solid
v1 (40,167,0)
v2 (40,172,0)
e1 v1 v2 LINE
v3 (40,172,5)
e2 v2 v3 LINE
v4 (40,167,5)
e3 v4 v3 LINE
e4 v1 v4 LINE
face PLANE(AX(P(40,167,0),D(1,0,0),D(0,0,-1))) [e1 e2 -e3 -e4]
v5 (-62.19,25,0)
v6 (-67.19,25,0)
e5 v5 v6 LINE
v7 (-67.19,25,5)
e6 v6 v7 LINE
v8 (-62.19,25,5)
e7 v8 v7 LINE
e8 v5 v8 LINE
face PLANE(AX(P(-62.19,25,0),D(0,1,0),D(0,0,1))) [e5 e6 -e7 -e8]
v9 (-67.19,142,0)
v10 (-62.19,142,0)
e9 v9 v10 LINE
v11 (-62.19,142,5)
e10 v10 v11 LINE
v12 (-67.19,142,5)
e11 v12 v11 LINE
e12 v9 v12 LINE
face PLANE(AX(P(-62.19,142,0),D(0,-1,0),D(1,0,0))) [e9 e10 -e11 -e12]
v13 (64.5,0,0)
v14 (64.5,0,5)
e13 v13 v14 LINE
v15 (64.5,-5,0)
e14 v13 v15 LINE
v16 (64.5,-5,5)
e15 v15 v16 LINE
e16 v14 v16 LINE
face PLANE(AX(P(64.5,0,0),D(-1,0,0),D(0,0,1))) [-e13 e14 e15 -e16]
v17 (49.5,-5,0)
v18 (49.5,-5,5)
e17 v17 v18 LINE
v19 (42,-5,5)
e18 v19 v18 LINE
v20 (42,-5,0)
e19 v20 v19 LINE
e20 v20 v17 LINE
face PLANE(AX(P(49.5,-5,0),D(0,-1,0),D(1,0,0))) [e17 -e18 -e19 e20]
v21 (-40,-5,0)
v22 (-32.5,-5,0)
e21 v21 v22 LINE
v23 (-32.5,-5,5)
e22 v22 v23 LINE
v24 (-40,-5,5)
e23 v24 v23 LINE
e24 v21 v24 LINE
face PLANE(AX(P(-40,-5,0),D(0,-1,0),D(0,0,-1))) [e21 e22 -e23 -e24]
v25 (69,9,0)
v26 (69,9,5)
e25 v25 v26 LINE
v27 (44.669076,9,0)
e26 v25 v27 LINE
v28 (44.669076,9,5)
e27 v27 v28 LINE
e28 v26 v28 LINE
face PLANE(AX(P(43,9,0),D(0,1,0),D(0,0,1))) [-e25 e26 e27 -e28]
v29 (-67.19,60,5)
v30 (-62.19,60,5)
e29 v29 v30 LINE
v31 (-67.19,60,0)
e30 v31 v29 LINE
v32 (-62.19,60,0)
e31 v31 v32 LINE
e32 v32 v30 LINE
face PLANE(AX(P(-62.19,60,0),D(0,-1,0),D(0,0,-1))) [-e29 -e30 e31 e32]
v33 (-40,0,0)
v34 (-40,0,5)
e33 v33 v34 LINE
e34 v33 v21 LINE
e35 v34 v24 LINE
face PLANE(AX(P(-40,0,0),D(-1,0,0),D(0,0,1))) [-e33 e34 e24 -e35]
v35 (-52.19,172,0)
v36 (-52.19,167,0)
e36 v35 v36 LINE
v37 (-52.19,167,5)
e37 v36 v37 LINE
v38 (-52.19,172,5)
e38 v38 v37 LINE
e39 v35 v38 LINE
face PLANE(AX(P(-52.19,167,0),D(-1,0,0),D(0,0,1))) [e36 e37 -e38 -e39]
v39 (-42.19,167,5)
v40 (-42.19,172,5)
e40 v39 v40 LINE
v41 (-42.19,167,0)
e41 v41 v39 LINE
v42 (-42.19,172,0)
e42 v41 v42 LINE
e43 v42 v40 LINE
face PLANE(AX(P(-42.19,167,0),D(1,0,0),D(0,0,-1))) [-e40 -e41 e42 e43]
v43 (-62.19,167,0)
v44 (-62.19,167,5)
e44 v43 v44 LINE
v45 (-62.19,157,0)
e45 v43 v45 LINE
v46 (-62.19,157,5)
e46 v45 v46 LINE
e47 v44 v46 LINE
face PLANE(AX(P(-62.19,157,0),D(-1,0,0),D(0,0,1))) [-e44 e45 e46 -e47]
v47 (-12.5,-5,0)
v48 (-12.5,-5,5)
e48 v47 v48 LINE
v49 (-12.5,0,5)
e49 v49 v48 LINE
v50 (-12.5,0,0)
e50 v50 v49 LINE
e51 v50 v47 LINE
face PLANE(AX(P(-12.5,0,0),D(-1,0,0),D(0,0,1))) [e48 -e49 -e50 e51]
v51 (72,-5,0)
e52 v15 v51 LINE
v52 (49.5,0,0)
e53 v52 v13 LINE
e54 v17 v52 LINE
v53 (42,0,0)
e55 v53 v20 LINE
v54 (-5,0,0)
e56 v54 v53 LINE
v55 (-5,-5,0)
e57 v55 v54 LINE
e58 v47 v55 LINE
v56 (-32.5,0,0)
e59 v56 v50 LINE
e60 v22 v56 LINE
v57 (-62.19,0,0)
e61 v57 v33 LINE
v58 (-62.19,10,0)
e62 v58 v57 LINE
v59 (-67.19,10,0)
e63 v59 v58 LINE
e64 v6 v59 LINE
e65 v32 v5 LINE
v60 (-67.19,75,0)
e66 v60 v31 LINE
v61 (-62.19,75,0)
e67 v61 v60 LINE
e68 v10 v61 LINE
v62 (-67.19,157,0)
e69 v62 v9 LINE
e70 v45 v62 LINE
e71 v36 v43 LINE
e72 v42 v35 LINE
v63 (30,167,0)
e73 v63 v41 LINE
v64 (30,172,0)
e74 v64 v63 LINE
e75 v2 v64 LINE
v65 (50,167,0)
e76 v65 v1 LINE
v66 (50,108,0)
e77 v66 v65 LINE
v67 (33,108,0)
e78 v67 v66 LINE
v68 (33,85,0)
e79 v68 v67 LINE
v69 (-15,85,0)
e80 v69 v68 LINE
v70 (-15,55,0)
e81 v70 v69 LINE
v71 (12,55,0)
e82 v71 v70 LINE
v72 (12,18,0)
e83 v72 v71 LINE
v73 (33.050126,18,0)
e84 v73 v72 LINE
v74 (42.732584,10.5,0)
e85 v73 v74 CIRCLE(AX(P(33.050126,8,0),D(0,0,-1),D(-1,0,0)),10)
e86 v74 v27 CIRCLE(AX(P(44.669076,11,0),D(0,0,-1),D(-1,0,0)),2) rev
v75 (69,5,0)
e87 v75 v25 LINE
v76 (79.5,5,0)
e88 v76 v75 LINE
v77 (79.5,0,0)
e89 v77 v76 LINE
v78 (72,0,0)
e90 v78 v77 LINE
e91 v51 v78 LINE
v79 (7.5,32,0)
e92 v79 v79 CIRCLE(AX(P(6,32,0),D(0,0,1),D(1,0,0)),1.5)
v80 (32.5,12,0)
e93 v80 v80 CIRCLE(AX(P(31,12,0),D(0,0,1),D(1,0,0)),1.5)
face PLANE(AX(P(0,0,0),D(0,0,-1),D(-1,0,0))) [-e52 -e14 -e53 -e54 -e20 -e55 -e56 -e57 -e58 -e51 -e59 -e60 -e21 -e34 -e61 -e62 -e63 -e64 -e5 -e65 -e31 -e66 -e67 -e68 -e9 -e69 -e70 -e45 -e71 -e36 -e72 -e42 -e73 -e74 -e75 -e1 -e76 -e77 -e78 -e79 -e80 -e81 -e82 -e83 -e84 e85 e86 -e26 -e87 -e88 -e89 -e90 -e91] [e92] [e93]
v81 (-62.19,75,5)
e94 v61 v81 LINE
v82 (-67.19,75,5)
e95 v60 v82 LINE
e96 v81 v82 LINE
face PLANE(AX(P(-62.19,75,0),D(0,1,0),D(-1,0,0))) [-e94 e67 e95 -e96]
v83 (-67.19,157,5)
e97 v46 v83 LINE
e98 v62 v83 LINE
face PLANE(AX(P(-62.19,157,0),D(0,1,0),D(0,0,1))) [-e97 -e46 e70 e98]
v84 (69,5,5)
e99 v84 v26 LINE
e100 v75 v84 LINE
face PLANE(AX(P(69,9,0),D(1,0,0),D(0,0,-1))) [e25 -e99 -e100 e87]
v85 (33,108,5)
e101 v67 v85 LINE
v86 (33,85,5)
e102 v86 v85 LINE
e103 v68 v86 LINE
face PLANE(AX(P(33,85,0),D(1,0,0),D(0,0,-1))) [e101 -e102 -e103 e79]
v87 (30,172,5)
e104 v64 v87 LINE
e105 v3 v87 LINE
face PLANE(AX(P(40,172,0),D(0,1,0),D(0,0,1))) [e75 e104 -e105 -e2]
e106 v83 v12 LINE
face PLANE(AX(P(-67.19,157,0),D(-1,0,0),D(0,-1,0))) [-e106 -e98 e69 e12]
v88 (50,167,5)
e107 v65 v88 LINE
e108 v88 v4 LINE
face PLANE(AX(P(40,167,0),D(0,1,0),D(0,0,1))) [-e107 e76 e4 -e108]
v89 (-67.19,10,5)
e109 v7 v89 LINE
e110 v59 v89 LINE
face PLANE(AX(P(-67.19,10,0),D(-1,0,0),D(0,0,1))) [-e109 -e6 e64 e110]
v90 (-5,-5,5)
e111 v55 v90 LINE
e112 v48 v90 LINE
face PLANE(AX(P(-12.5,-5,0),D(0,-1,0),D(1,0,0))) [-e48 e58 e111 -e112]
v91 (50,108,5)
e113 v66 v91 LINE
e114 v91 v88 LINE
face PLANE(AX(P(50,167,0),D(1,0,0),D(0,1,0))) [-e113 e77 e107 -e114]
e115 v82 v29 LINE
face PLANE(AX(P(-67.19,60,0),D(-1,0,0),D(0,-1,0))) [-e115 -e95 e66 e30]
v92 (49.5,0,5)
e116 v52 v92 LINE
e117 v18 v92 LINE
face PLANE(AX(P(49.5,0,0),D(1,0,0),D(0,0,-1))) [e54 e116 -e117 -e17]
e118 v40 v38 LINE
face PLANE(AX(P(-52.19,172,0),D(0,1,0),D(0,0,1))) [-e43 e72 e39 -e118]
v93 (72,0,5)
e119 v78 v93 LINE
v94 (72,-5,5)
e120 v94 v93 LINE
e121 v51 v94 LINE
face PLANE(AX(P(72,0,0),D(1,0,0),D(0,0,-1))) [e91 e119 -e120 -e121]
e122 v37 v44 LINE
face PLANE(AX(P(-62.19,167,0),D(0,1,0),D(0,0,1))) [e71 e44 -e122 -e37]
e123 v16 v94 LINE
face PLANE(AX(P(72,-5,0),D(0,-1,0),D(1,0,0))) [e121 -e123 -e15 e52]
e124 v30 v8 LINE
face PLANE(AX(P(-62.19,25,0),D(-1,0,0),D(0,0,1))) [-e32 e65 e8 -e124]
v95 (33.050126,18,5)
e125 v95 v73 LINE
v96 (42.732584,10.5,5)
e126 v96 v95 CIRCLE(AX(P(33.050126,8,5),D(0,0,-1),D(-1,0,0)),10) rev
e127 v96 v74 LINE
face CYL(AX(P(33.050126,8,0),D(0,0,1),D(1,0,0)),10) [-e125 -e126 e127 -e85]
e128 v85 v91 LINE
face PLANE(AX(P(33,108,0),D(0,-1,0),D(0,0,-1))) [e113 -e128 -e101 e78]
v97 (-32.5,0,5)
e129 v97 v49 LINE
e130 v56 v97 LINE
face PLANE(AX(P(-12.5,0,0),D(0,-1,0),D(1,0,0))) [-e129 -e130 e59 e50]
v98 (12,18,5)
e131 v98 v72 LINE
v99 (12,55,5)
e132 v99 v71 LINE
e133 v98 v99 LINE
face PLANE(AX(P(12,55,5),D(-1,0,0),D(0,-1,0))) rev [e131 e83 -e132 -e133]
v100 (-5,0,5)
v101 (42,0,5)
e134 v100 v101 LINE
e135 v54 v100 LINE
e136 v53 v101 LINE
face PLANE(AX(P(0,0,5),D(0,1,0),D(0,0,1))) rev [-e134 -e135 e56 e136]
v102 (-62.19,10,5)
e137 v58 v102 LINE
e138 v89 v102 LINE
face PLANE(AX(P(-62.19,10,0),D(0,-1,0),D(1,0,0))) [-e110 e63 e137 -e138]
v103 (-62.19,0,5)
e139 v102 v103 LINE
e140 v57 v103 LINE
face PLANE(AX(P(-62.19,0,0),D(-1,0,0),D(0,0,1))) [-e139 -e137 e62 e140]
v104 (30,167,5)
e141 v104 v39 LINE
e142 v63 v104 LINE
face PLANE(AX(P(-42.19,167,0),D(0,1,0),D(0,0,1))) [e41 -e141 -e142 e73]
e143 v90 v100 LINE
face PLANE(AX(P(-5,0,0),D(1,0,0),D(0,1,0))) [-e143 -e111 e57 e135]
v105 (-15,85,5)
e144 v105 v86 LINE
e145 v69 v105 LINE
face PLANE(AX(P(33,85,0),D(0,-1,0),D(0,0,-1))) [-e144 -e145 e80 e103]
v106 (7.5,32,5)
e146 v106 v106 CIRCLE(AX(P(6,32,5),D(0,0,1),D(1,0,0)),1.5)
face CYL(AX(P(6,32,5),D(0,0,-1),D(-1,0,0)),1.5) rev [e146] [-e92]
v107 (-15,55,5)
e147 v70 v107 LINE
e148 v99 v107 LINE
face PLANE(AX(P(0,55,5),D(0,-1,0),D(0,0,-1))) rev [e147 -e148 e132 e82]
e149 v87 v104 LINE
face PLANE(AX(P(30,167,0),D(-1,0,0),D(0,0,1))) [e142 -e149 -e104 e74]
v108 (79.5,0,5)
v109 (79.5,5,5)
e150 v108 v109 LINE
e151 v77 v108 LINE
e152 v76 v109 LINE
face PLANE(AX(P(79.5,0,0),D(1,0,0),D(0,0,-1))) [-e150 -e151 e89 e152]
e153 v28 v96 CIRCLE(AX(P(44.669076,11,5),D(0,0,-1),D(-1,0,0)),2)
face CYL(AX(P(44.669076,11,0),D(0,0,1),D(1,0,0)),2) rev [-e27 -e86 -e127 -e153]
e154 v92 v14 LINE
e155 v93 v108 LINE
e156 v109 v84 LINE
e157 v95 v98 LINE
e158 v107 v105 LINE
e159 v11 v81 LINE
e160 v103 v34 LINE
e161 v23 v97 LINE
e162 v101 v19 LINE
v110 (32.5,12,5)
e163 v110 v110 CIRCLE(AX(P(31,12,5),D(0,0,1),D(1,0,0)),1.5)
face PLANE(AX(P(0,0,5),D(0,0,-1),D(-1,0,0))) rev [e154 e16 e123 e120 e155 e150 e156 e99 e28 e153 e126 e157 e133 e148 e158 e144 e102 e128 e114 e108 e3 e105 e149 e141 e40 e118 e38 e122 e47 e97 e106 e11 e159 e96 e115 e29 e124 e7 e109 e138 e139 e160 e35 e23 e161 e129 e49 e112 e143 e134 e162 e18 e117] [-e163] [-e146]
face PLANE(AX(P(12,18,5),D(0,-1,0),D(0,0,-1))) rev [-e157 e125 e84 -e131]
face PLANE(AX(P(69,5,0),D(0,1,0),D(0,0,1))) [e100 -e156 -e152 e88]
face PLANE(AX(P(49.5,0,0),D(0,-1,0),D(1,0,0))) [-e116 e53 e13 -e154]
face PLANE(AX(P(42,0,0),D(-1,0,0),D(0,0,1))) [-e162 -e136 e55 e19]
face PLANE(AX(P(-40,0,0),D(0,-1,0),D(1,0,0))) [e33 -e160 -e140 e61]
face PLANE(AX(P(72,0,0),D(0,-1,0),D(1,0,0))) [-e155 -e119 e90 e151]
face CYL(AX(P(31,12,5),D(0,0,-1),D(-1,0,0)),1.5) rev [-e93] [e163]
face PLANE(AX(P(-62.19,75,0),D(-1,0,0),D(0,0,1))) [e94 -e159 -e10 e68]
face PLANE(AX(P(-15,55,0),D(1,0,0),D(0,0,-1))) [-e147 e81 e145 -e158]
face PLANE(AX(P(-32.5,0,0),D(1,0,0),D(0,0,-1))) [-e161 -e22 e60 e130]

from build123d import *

# Parameters (mm, degrees)
ESQUISSE1_R        = 1.5
BOSS_EXTRU_1_DEPTH = 5
BOSS_EXTRU_2_DEPTH = 5
CONG_1_R           = 10
CONG_2_R           = 2


with BuildPart() as part:
    # Esquisse1 → Boss.-Extru.1 (new body)
    with BuildSketch(Plane.XY):
        Polygon((0, 0), (37, 0), (37, 18), (12, 18), (12, 55), (0, 55), align=None)
        with Locations((6, 32)):
            Circle(ESQUISSE1_R, mode=Mode.SUBTRACT)
        with Locations((31, 12)):
            Circle(ESQUISSE1_R, mode=Mode.SUBTRACT)
    extrude(amount=BOSS_EXTRU_1_DEPTH)

    # Esquisse2 → Boss.-Extru.2 (add)
    with BuildSketch(Plane.XY.offset(5)):
        Polygon((37, 0), (42, 0), (42, -5), (49.5, -5), (49.5, 0), (64.5, 0), (64.5, -5), (72, -5), (72, 0), (79.5, 0), (79.5, 5), (69, 5), (69, 9), (43, 9), (43, 18), (37, 18), align=None)
        Polygon((0, 0), (-5, 0), (-5, -5), (-12.5, -5), (-12.5, 0), (-32.5, 0), (-32.5, -5), (-40, -5), (-40, 0), (-62.19, 0), (-62.19, 10), (-67.19, 10), (-67.19, 25), (-62.19, 25), (-62.19, 60), (-67.19, 60), (-67.19, 75), (-62.19, 75), (-62.19, 142), (-67.19, 142), (-67.19, 157), (-62.19, 157), (-62.19, 167), (-52.19, 167), (-52.19, 172), (-42.19, 172), (-42.19, 167), (30, 167), (30, 172), (40, 172), (40, 167), (50, 167), (50, 108), (33, 108), (33, 85), (-15, 85), (-15, 55), (0, 55), align=None)
    extrude(amount=-BOSS_EXTRU_2_DEPTH)

    # Congé1
    # the kernel refuses this fillet: 10 mm, written as the material it takes off along each edge
    with BuildSketch(Plane(origin=(43, 18, 29.874685928), x_dir=(0, -1, 0), z_dir=(0, 0, -1))) as cong_1_piece_1:
        with BuildLine():
            CenterArc((10, 9.949874371), CONG_1_R, 180, 84.260829523)
            Line((0, 9.949874371), (-0.2, 9.949874371))
            Line((-0.2, 9.949874371), (-0.2, 0))
            Line((-0.2, 0), (0, -0.2))
            ThreePointArc((0, -0.2), (4.5, -0.2), (8.98, -0.198997487))
            Line((8.98, -0.198997487), (9, 0))
        make_face()
    extrude(amount=54.749371855, mode=Mode.SUBTRACT)

    # Congé2
    cong_2_edges = [part.edges().sort_by_distance(p)[0] for p in [
        (43, 9, 2.5),
    ]]
    fillet(cong_2_edges, radius=CONG_2_R)


solid = part.part
